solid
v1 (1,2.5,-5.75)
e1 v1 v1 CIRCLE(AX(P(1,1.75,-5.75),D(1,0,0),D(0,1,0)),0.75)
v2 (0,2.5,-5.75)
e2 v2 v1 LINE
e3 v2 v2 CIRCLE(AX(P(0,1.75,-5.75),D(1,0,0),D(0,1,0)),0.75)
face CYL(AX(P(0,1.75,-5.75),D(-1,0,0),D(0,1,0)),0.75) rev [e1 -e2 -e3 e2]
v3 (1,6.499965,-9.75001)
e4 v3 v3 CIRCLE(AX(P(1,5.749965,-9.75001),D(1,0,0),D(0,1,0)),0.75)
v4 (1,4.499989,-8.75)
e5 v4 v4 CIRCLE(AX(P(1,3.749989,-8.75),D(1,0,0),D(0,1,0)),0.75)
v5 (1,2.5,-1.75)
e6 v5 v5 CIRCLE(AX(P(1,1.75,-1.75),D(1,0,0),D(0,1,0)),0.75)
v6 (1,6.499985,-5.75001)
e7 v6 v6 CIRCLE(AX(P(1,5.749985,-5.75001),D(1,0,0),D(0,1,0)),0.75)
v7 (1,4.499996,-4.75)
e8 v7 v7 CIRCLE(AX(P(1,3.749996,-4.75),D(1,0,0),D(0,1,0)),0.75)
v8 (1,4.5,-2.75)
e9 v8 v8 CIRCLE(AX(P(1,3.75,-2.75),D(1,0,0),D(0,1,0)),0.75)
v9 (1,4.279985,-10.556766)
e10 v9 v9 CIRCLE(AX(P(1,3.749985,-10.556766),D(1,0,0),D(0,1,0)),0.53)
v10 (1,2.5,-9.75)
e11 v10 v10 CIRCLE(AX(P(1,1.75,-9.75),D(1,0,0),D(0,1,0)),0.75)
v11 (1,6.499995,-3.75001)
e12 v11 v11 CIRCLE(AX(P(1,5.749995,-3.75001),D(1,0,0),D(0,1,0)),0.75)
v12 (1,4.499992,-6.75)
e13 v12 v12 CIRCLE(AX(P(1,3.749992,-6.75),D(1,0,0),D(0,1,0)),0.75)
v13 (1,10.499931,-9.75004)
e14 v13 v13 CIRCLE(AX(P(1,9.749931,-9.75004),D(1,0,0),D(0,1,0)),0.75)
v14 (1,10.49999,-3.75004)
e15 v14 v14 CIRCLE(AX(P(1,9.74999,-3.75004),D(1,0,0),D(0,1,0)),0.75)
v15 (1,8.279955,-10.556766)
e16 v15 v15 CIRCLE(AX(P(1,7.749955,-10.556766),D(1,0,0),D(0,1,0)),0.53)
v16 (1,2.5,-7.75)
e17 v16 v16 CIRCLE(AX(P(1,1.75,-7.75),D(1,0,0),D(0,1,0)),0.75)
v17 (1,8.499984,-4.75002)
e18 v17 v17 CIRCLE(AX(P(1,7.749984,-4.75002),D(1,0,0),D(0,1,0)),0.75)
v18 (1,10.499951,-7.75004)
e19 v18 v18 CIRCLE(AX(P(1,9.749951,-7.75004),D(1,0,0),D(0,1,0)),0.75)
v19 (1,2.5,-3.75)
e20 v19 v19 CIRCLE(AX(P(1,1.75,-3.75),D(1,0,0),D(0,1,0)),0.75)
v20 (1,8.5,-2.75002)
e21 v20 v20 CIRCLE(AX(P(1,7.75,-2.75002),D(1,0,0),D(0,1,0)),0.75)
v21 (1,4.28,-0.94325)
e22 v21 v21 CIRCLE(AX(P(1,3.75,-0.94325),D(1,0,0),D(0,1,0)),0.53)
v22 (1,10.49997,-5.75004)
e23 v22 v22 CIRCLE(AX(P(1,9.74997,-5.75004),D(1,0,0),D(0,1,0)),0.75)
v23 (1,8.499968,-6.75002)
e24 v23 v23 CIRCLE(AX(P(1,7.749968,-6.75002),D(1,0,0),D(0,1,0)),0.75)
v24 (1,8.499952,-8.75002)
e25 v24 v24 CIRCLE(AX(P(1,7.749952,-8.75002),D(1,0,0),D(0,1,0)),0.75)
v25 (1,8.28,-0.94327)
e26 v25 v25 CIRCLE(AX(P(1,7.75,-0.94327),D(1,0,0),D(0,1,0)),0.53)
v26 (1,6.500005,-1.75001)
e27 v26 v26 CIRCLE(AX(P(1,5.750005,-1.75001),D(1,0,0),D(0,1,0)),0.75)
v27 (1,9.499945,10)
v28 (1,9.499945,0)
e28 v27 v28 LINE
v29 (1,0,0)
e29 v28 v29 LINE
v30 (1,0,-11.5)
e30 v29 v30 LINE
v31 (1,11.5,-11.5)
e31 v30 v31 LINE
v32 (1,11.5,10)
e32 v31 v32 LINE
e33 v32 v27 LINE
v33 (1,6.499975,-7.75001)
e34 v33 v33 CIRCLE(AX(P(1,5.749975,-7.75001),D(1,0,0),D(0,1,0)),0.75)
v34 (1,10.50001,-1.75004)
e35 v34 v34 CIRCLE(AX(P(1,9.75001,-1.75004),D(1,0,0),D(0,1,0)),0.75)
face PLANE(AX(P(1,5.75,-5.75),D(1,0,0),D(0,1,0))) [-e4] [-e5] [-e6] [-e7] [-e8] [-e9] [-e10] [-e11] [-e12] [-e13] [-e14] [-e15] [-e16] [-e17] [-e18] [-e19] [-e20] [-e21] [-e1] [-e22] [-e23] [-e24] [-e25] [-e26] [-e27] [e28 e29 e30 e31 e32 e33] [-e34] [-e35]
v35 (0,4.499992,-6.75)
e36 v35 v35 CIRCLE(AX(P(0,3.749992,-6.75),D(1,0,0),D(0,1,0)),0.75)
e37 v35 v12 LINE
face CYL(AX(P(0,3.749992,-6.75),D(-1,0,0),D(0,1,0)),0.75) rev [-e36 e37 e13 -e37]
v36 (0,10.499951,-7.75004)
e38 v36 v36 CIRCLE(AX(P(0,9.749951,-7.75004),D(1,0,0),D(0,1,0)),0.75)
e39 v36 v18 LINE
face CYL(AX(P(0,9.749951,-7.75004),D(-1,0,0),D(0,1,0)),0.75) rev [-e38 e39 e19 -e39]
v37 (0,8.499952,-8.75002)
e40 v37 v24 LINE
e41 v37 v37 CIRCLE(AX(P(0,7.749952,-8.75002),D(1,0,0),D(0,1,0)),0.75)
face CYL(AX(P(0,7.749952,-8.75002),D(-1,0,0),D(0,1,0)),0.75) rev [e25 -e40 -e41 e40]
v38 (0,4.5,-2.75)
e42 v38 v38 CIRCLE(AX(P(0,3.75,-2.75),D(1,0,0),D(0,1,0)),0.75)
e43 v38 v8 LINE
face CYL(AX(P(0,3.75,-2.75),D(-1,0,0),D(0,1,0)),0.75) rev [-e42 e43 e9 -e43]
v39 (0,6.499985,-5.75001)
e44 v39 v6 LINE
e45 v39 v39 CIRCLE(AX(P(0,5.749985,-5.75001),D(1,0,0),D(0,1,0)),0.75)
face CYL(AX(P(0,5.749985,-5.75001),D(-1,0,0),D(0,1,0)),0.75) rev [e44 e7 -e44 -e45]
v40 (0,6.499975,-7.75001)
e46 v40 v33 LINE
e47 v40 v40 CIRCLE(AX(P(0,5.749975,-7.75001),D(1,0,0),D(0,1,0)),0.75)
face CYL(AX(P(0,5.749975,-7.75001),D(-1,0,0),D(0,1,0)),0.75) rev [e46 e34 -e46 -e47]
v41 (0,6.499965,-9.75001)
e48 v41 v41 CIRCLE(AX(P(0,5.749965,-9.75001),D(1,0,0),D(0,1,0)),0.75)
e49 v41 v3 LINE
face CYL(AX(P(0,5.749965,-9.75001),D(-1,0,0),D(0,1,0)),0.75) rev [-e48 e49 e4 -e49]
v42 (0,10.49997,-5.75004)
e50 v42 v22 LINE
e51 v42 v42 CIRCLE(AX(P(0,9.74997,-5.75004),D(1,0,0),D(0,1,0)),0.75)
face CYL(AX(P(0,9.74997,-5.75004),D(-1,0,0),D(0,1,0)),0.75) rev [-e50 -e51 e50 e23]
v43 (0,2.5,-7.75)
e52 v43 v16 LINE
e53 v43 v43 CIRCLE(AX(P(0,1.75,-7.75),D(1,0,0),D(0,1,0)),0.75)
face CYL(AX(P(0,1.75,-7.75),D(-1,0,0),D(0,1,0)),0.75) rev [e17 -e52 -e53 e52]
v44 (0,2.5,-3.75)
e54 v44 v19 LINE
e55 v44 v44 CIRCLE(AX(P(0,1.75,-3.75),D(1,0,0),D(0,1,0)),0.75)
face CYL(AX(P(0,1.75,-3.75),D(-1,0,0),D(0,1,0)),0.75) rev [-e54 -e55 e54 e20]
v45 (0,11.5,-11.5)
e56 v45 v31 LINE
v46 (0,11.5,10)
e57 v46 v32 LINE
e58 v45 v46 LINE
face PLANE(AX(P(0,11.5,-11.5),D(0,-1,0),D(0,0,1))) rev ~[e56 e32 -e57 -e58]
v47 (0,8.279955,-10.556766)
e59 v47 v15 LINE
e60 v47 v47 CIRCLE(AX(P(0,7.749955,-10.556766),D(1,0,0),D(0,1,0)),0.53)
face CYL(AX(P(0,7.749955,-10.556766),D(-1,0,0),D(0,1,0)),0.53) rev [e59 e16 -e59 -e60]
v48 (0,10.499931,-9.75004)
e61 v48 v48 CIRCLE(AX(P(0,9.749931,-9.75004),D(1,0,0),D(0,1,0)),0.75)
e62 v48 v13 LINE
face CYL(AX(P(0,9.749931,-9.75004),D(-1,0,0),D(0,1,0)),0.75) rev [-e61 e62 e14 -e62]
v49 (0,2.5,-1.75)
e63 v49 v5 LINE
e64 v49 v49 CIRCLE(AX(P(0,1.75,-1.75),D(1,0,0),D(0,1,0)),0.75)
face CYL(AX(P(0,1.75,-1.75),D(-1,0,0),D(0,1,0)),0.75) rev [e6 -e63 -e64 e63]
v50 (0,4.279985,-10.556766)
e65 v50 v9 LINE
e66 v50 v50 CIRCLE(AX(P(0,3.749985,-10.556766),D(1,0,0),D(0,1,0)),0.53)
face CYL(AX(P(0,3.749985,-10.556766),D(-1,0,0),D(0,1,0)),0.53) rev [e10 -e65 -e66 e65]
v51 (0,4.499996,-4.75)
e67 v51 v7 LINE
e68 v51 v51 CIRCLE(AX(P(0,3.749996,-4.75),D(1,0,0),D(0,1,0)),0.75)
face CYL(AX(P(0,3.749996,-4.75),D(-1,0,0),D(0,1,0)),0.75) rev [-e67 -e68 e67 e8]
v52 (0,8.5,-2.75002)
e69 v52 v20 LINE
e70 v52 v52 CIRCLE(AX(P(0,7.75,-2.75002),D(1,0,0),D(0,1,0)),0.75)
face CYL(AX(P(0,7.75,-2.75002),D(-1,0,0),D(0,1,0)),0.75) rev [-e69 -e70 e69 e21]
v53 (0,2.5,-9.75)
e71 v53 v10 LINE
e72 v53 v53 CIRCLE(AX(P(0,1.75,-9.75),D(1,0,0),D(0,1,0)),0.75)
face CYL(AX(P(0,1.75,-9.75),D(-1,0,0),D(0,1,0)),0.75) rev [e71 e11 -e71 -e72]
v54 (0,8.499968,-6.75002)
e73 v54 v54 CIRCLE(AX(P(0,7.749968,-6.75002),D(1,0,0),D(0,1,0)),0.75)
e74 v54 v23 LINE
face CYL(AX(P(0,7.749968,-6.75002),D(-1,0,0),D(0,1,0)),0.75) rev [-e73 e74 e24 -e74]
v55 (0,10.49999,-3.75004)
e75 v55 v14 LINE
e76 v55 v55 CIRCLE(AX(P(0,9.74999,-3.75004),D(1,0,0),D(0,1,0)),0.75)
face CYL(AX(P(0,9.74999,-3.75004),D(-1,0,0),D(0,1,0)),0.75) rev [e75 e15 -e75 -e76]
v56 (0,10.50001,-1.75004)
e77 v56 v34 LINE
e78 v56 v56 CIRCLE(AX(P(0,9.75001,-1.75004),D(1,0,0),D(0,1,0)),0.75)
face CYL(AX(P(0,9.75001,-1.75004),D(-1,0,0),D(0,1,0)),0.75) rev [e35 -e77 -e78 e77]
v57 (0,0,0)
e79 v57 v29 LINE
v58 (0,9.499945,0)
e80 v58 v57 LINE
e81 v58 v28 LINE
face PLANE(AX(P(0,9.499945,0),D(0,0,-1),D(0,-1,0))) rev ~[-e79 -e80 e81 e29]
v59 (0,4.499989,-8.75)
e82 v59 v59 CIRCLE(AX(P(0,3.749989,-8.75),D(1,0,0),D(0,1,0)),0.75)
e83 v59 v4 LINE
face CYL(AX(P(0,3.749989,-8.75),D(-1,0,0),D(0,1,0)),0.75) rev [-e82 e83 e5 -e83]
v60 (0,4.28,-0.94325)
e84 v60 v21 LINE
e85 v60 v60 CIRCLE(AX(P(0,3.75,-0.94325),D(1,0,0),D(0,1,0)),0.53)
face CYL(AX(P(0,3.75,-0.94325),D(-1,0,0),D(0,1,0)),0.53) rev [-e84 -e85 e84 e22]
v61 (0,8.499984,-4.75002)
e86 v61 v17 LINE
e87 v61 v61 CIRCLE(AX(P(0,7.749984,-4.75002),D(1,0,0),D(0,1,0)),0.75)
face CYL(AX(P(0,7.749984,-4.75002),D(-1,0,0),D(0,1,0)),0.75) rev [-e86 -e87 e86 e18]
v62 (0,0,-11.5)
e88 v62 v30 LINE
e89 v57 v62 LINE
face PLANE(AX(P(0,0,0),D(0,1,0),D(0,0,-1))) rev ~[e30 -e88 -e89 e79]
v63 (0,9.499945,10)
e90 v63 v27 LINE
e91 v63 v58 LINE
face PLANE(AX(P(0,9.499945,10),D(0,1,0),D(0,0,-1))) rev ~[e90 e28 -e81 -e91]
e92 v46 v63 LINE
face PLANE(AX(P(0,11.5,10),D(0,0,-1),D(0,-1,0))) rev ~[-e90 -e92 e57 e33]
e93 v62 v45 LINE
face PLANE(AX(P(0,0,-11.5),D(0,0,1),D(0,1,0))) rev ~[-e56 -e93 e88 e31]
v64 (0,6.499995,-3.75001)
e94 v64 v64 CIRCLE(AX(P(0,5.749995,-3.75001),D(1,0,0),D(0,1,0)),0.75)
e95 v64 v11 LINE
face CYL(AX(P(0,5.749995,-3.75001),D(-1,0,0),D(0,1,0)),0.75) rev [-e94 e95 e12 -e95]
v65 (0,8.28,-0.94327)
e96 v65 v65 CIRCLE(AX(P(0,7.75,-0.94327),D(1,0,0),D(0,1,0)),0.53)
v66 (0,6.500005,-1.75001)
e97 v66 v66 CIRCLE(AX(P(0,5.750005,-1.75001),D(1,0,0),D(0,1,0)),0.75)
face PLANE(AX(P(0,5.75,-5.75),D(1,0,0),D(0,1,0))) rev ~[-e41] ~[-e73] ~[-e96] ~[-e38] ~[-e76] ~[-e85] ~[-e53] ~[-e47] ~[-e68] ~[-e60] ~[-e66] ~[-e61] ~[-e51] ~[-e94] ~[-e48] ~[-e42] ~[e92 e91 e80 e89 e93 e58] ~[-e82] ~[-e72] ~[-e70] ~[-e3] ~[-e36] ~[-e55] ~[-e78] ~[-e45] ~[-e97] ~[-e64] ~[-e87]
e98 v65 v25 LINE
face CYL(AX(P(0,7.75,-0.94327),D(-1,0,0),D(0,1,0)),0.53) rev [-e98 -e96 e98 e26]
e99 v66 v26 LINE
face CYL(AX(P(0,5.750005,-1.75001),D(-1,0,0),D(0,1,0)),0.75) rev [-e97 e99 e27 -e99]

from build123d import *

# Parameters (mm, degrees)
F0_R     = 0.75
F0_R_2   = 0.53
F1_DEPTH = 1


# Not quite as in the source:
# - a feature names something its author has since deleted; it is built from what else it names


with BuildPart() as f1:
    # F0 (on Right) → F1 (new body)
    with BuildSketch(Plane.YZ):
        Polygon((8.384144865, 0), (0, 0), (0, -11.5), (11.5, -11.5), (11.5, 0), (11.2427603453, 0), (10.384144865, 0), (9.499944865, 0), align=None)
        with Locations((1.7500000088, -9.75)):
            Circle(F0_R, mode=Mode.SUBTRACT)
        with Locations((1.75, -7.75)):
            Circle(F0_R, mode=Mode.SUBTRACT)
        with Locations((3.7499851588, -10.5567658602)):
            Circle(F0_R_2, mode=Mode.SUBTRACT)
        with Locations((5.7499653617, -9.750009894)):
            Circle(F0_R, mode=Mode.SUBTRACT)
        with Locations((3.7499885936, -8.7499999912)):
            Circle(F0_R, mode=Mode.SUBTRACT)
        with Locations((3.7499923957, -6.75)):
            Circle(F0_R, mode=Mode.SUBTRACT)
        with Locations((5.7499752647, -7.7500098941)):
            Circle(F0_R, mode=Mode.SUBTRACT)
        with Locations((1.75, -5.75)):
            Circle(F0_R, mode=Mode.SUBTRACT)
        with Locations((1.75, -3.75)):
            Circle(F0_R, mode=Mode.SUBTRACT)
        with Locations((1.75, -1.75)):
            Circle(F0_R, mode=Mode.SUBTRACT)
        with Locations((3.7499961979, -4.75)):
            Circle(F0_R, mode=Mode.SUBTRACT)
        with Locations((5.7499851588, -5.7500098941)):
            Circle(F0_R, mode=Mode.SUBTRACT)
        with Locations((5.7499950529, -3.7500098941)):
            Circle(F0_R, mode=Mode.SUBTRACT)
        with Locations((3.75, -2.75)):
            Circle(F0_R, mode=Mode.SUBTRACT)
        with Locations((3.75, -0.94325)):
            Circle(F0_R_2, mode=Mode.SUBTRACT)
        with Locations((7.749955461, -10.5567658602)):
            Circle(F0_R_2, mode=Mode.SUBTRACT)
        with Locations((7.7499520262, -8.7500197836)):
            Circle(F0_R, mode=Mode.SUBTRACT)
        with Locations((7.7499680167, -6.7500197925)):
            Circle(F0_R, mode=Mode.SUBTRACT)
        with Locations((9.7499307145, -9.750039585)):
            Circle(F0_R, mode=Mode.SUBTRACT)
        with Locations((9.749950516, -7.7500395851)):
            Circle(F0_R, mode=Mode.SUBTRACT)
        with Locations((7.7499840072, -4.7500197926)):
            Circle(F0_R, mode=Mode.SUBTRACT)
        with Locations((5.750004947, -1.7500098941)):
            Circle(F0_R, mode=Mode.SUBTRACT)
        with Locations((7.7499999977, -2.7500197927)):
            Circle(F0_R, mode=Mode.SUBTRACT)
        with Locations((7.7499999977, -0.9432697927)):
            Circle(F0_R_2, mode=Mode.SUBTRACT)
        with Locations((9.7499703087, -5.7500395852)):
            Circle(F0_R, mode=Mode.SUBTRACT)
        with Locations((9.7499901013, -3.7500395853)):
            Circle(F0_R, mode=Mode.SUBTRACT)
        with Locations((9.750009894, -1.7500395854)):
            Circle(F0_R, mode=Mode.SUBTRACT)
        Polygon((9.499944865, 10), (9.499944865, 0), (10.384144865, 0), (11.2427603453, 0), (11.5, 0), (11.5, 10), (10.384144865, 10), align=None)
    extrude(amount=F1_DEPTH)


solid = f1.part
